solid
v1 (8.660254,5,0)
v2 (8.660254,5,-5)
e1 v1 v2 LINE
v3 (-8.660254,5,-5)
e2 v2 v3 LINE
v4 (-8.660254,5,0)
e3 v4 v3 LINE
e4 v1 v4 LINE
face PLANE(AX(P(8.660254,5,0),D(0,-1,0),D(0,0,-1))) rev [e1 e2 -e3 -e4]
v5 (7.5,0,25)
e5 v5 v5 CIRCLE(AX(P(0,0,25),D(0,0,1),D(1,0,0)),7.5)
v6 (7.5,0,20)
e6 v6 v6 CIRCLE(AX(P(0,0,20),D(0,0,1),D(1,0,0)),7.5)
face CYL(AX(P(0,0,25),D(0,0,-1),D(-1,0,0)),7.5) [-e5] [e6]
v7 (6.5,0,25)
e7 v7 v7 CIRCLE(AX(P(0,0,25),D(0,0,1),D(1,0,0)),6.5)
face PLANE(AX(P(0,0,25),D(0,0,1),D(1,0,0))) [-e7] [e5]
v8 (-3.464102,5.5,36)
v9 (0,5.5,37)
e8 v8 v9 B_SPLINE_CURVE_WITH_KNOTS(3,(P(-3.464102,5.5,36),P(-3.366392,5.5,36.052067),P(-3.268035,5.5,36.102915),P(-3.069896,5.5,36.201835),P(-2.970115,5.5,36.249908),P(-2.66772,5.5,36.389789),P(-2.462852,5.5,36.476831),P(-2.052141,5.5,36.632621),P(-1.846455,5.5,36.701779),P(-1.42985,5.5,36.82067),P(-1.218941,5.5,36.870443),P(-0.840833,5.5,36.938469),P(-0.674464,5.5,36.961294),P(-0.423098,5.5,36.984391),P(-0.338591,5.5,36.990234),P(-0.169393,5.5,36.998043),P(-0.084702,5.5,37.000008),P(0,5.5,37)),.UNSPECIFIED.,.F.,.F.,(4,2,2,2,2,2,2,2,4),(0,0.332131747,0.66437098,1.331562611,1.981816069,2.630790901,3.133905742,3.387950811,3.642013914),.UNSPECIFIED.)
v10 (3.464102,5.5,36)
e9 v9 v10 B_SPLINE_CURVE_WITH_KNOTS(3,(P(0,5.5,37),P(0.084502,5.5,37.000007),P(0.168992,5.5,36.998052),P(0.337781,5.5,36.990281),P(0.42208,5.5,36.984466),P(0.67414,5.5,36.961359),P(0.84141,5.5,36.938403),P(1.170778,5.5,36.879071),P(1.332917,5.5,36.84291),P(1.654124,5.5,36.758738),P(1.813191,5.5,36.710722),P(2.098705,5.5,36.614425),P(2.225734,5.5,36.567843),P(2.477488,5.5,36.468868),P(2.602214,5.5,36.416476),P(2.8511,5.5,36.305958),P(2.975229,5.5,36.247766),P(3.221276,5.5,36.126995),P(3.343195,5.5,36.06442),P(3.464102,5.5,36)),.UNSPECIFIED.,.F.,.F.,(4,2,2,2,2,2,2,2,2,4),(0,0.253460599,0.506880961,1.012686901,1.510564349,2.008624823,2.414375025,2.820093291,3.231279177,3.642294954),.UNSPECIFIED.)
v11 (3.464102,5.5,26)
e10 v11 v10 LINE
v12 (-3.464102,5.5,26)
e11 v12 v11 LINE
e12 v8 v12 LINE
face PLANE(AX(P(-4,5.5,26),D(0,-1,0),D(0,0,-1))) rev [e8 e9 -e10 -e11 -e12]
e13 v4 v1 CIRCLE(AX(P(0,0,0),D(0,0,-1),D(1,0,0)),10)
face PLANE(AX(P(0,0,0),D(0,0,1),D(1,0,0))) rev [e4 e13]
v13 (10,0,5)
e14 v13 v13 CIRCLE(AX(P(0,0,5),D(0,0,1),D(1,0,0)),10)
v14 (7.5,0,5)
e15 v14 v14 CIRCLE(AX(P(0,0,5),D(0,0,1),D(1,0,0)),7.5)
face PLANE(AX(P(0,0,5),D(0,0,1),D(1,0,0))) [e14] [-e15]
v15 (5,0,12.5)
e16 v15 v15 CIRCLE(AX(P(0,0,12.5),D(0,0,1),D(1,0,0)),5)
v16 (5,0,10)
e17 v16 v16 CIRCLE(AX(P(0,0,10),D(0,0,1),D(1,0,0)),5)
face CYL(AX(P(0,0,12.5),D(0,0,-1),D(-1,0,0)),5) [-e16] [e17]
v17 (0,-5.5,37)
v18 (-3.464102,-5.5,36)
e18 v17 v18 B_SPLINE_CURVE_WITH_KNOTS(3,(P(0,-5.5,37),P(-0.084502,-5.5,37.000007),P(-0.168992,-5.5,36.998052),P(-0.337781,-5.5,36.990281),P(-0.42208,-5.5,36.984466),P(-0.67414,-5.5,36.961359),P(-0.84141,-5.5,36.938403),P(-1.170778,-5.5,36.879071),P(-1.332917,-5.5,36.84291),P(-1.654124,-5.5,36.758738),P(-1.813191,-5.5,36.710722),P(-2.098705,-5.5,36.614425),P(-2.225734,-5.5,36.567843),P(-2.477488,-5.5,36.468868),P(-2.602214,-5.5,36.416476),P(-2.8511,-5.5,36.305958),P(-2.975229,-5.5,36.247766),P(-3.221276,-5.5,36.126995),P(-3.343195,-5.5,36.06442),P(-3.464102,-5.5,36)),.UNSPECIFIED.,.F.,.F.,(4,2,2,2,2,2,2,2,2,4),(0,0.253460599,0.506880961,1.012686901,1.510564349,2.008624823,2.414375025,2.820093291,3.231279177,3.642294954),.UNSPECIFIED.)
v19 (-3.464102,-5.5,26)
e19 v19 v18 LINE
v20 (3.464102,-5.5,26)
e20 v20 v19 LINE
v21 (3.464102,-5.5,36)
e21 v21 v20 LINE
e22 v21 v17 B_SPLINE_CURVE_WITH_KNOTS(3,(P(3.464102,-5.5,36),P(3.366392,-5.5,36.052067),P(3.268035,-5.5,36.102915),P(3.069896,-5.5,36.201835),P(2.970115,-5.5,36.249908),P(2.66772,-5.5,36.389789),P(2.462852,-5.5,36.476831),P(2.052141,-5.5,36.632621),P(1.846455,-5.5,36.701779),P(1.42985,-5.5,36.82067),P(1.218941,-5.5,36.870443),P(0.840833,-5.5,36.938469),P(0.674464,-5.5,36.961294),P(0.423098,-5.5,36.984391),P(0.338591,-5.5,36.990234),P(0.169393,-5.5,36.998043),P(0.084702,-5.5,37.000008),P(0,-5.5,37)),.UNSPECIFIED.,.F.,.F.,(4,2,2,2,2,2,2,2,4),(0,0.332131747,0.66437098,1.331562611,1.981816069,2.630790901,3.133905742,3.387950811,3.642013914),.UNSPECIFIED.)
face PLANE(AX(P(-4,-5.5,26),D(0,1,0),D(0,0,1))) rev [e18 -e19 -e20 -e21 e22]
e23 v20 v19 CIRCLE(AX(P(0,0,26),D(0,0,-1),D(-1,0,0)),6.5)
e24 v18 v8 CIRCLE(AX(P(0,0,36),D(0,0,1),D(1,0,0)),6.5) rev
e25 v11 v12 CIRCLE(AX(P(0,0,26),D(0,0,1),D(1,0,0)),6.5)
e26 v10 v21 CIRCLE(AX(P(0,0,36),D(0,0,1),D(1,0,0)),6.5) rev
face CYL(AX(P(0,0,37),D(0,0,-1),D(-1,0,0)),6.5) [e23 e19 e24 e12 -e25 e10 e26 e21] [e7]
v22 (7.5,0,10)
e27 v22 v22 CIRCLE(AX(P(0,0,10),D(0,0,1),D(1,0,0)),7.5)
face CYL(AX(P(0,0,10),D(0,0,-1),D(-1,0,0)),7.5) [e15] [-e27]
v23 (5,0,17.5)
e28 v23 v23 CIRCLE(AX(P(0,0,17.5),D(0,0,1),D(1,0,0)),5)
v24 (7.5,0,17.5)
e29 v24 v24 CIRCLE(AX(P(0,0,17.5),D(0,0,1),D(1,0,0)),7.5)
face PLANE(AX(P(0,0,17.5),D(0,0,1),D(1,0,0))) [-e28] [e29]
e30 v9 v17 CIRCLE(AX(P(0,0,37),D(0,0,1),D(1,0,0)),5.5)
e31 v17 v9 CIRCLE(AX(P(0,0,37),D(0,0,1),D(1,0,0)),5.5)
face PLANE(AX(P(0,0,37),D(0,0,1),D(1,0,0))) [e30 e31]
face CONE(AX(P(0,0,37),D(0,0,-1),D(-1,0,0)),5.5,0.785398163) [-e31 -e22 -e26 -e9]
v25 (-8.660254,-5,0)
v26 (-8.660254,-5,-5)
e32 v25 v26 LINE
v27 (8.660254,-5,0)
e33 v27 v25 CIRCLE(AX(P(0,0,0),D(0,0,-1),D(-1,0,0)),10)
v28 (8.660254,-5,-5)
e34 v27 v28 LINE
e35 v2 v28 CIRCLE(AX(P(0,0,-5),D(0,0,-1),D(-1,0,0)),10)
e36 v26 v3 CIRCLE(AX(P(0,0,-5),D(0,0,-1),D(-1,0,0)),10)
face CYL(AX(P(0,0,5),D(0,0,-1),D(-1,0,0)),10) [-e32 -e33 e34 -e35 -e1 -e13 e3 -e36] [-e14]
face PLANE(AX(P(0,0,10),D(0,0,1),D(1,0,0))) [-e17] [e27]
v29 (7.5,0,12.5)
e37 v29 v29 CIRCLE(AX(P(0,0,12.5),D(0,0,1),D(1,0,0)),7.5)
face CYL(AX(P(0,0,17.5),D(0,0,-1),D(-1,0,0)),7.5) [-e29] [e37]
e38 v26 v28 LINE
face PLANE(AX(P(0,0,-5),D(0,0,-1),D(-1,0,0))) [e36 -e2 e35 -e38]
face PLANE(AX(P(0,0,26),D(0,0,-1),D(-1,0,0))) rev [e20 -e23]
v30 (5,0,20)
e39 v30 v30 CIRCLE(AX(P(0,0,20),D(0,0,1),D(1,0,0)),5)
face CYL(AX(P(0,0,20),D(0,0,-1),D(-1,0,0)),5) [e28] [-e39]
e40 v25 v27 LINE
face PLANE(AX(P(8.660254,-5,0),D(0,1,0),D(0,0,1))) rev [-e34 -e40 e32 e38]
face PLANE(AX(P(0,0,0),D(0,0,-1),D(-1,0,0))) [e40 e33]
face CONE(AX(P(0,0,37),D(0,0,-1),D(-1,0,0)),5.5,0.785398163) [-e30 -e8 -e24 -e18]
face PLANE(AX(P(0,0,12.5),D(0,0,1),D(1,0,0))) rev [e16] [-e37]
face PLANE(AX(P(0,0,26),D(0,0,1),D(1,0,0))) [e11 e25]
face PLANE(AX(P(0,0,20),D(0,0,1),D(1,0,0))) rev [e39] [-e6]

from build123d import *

# Parameters (mm, degrees)
SZKIC2_R                    = 10
DODANIE_WYCI_GNI_CIE1_DEPTH = 5
SZKIC3_R                    = 7.5
DODANIE_WYCI_GNI_CIE2_DEPTH = 5
SZKIC4_R                    = 5
DODANIE_WYCI_GNI_CIE3_DEPTH = 2.5
SZKIC5_R                    = 7.5
DODANIE_WYCI_GNI_CIE4_DEPTH = 5
SZKIC6_R                    = 5
DODANIE_WYCI_GNI_CIE5_DEPTH = 2.5
SZKIC7_R                    = 7.5
DODANIE_WYCI_GNI_CIE6_DEPTH = 5
SZKIC8_R                    = 6.5
DODANIE_WYCI_GNI_CIE7_DEPTH = 12
SZKIC10_W                   = 8
SZKIC10_H                   = 2
WYTNIJ_WYCI_GNI_CIE1_DEPTH  = 11
DODANIE_WYCI_GNI_CIE8_START = 5
SZKIC11_R                   = 10
DODANIE_WYCI_GNI_CIE8_DEPTH = 5
WYTNIJ_WYCI_GNI_CIE2_DEPTH  = 5


with BuildPart() as part:
    # Szkic2 → Dodanie-wyciągnięcie1 (new body)
    with BuildSketch(Plane.XY):
        Circle(SZKIC2_R)
    extrude(amount=DODANIE_WYCI_GNI_CIE1_DEPTH)

    # Szkic3 → Dodanie-wyciągnięcie2 (add)
    with BuildSketch(Plane.XY.offset(5)):
        Circle(SZKIC3_R)
    extrude(amount=DODANIE_WYCI_GNI_CIE2_DEPTH)

    # Szkic4 → Dodanie-wyciągnięcie3 (add)
    with BuildSketch(Plane.XY.offset(10)):
        Circle(SZKIC4_R)
    extrude(amount=DODANIE_WYCI_GNI_CIE3_DEPTH)

    # Szkic5 → Dodanie-wyciągnięcie4 (add)
    with BuildSketch(Plane.XY.offset(12.5)):
        Circle(SZKIC5_R)
    extrude(amount=DODANIE_WYCI_GNI_CIE4_DEPTH)

    # Szkic6 → Dodanie-wyciągnięcie5 (add)
    with BuildSketch(Plane.XY.offset(17.5)):
        Circle(SZKIC6_R)
    extrude(amount=DODANIE_WYCI_GNI_CIE5_DEPTH)

    # Szkic7 → Dodanie-wyciągnięcie6 (add)
    with BuildSketch(Plane.XY.offset(20)):
        Circle(SZKIC7_R)
    extrude(amount=DODANIE_WYCI_GNI_CIE6_DEPTH)

    # Szkic8 → Dodanie-wyciągnięcie7 (add)
    with BuildSketch(Plane.XY.offset(25)):
        Circle(SZKIC8_R)
    extrude(amount=DODANIE_WYCI_GNI_CIE7_DEPTH)

    # Szkic10 → Wytnij-wyciągnięcie1 (cut)
    with BuildSketch(Plane.XY.offset(37)):
        with Locations((0, 6.5)):
            Rectangle(SZKIC10_W, SZKIC10_H)
        with Locations((0, -6.5)):
            Rectangle(SZKIC10_W, SZKIC10_H)
    extrude(amount=-WYTNIJ_WYCI_GNI_CIE1_DEPTH, mode=Mode.SUBTRACT)

    # Szkic11 → Dodanie-wyciągnięcie8 (add)
    with BuildSketch(Plane(origin=(0, 0, 0), x_dir=(-1, 0, 0), z_dir=(0, 0, -1)).offset(DODANIE_WYCI_GNI_CIE8_START)):
        Circle(SZKIC11_R)
    extrude(amount=-DODANIE_WYCI_GNI_CIE8_DEPTH)

    # Szkic13 → Wytnij-wyciągnięcie2 (cut)
    with BuildSketch(Plane(origin=(0, 0, -5), x_dir=(-1, 0, 0), z_dir=(0, 0, -1))):
        with BuildLine():
            Line((-8.660254038, -5), (8.660254038, -5))
            ThreePointArc((8.660254038, -5), (0, -10), (-8.660254038, -5))
        make_face()
        with BuildLine():
            Line((-8.660254038, 5), (8.660254038, 5))
            ThreePointArc((8.660254038, 5), (0, 10), (-8.660254038, 5))
        make_face()
    extrude(amount=-WYTNIJ_WYCI_GNI_CIE2_DEPTH, mode=Mode.SUBTRACT)

    # Sfazowanie1: read off the stored shape, not the designer's step
    # Sfazowanie1 outline → Sfazowanie1 (revolve, cut)
    with BuildSketch(Plane.XZ):
        Polygon((6.5, 37.000001298), (5.499998702, 37.000001298), (6.5, 36), align=None)
    revolve(axis=Axis((0, 0, 0), (0, 0, 1)), mode=Mode.SUBTRACT)


solid = part.part
